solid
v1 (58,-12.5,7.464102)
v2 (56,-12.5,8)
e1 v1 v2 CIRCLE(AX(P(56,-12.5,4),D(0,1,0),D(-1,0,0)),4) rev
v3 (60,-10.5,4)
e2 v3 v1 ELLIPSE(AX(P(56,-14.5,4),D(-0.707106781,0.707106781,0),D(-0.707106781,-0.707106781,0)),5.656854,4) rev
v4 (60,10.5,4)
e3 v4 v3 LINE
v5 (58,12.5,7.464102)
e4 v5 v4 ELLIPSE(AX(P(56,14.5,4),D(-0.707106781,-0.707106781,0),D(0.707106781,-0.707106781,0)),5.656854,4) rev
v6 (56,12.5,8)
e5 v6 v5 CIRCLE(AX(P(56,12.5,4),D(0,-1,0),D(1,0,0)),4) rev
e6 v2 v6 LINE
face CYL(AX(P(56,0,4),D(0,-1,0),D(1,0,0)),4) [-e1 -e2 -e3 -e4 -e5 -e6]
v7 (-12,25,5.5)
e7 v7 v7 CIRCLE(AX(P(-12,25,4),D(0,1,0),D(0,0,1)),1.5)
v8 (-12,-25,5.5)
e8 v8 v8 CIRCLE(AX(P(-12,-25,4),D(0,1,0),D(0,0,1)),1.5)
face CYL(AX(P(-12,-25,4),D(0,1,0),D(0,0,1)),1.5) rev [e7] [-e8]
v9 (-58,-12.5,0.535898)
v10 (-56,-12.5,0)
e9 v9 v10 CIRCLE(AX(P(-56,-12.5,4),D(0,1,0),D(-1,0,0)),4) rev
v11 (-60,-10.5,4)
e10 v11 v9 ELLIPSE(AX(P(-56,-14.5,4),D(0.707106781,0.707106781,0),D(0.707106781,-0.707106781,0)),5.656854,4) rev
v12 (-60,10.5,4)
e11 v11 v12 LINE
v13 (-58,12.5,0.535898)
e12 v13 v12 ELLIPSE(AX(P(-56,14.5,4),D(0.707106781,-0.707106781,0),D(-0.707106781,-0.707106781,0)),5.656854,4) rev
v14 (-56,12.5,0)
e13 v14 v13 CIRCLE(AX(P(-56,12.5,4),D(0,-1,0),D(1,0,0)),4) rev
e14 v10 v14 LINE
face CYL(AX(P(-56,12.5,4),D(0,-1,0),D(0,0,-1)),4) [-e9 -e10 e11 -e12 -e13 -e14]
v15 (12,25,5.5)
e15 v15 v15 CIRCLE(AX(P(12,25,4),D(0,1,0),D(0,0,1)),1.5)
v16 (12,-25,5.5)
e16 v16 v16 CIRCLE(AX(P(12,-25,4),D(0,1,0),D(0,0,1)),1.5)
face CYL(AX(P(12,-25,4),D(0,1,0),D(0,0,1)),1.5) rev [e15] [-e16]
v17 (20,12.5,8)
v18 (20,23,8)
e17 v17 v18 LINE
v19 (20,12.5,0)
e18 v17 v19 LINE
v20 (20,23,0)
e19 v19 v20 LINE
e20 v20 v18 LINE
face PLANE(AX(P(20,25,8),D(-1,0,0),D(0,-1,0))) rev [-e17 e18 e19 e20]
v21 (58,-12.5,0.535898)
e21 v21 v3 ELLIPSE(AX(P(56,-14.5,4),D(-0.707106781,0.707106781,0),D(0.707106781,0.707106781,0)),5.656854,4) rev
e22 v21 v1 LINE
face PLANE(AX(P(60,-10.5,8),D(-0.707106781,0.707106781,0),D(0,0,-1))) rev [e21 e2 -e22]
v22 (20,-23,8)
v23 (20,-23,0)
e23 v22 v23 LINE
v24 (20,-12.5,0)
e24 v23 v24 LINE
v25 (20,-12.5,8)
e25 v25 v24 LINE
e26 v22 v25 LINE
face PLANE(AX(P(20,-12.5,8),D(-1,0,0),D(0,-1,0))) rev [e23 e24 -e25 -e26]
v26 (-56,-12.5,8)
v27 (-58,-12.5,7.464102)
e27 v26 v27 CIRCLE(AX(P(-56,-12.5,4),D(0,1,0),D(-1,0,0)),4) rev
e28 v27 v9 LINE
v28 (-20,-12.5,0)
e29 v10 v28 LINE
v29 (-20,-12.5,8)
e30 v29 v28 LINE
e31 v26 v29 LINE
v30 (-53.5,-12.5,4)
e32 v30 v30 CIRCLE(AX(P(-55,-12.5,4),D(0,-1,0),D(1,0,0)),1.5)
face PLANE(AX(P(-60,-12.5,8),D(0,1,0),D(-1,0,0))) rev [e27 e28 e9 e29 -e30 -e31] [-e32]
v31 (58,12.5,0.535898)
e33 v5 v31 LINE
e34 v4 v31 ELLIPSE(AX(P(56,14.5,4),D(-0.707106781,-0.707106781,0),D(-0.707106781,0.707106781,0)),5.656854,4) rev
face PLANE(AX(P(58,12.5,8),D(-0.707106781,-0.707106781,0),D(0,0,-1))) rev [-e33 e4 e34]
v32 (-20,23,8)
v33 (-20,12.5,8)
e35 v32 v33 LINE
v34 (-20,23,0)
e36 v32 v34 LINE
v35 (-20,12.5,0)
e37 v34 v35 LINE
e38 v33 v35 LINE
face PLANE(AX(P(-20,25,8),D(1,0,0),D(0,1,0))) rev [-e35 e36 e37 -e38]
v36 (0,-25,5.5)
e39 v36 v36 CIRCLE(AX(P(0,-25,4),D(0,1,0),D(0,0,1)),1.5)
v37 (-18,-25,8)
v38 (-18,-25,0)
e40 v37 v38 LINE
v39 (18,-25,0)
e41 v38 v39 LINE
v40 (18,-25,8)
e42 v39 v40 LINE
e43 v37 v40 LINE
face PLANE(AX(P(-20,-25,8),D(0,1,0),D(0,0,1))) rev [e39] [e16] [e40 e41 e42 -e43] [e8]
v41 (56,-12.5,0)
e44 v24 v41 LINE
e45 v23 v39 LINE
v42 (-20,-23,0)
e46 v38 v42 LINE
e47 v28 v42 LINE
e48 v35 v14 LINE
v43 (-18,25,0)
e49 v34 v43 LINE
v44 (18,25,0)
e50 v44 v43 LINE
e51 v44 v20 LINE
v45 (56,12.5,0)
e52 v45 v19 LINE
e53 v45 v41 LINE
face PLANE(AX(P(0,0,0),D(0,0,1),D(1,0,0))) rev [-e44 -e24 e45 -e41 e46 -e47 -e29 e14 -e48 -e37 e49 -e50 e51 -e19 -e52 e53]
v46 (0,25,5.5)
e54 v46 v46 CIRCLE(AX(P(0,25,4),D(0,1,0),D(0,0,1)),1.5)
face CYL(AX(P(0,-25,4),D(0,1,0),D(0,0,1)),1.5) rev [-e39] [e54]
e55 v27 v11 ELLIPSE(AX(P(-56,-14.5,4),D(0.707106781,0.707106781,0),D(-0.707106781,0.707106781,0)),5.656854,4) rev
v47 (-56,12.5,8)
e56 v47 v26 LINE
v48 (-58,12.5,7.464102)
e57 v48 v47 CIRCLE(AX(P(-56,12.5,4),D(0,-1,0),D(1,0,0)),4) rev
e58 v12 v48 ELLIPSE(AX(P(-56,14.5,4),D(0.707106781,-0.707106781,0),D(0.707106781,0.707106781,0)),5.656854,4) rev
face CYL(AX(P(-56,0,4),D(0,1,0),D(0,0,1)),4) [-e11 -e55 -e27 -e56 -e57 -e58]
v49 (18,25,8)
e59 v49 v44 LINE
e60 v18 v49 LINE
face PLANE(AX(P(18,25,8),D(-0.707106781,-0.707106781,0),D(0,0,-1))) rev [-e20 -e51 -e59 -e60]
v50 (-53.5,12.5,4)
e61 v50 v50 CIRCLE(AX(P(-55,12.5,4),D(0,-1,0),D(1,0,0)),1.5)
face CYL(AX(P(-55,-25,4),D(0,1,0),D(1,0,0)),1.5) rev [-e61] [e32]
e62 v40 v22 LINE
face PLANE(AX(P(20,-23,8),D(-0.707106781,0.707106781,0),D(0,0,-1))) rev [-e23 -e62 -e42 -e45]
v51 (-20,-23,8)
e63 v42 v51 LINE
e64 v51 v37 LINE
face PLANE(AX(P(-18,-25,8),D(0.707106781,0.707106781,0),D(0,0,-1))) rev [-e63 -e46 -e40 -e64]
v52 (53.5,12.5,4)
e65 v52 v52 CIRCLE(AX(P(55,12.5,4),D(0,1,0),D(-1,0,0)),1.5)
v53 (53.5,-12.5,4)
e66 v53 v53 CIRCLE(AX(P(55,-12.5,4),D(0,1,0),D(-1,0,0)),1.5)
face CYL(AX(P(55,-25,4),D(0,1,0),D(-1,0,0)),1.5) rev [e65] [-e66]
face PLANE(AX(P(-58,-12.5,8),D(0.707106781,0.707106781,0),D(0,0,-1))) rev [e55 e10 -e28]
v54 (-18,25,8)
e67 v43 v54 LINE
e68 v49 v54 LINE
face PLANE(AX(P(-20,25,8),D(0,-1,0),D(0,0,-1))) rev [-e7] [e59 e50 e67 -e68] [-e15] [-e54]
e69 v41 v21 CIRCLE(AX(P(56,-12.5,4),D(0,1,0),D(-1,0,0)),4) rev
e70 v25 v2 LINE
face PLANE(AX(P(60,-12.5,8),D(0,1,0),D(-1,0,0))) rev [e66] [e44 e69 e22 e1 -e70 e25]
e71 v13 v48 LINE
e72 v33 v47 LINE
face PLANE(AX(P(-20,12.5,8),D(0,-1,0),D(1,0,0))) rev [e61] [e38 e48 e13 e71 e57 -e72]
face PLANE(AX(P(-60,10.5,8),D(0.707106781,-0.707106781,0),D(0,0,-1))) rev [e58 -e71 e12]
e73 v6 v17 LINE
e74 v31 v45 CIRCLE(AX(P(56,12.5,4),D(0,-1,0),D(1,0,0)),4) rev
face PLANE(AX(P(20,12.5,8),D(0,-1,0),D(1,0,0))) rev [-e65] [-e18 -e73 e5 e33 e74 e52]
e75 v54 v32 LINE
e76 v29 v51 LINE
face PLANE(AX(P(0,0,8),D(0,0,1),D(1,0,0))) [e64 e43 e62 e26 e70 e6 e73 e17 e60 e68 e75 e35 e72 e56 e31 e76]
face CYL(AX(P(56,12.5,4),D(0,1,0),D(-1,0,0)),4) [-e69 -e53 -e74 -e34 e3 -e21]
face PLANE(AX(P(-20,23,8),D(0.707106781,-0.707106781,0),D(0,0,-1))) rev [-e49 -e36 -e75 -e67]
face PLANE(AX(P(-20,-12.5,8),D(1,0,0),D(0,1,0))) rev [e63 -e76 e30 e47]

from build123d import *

# Parameters (mm, degrees)
EXTRUDE_1_DEPTH     = 8
CHAMFER_1_SIZE      = 2
SKETCH_4_R          = 1.5
CUT_EXTRUDE_3_DEPTH = 50
CHAMFER_3_SIZE      = 2
FILLET_1_R          = 4
SKETCH_6_R          = 1.5
CUT_EXTRUDE_5_DEPTH = 72.205687975


with BuildPart() as part:
    # 草图1 → 凸台-拉伸1 (new body)
    with BuildSketch(Plane.XY):
        Polygon((-20, 25), (20, 25), (20, 12.5), (60, 12.5), (60, -12.5), (20, -12.5), (20, -25), (-20, -25), (-20, -12.5), (-60, -12.5), (-60, 12.5), (-20, 12.5), align=None)
    extrude(amount=EXTRUDE_1_DEPTH)

    # 倒角1
    chamfer_1_edges = [part.edges().sort_by_distance(p)[0] for p in [
        (20, -25, 4),
        (-20, -25, 4),
        (-20, 25, 4),
        (20, 25, 4),
    ]]
    chamfer(chamfer_1_edges, length=CHAMFER_1_SIZE)

    # 草图4 → 切除-拉伸3 (cut)
    with BuildSketch(Plane(origin=(0, 25, 0), x_dir=(1, 0, 0), z_dir=(0, 1, 0))):
        with Locations(Location((-12, -4, 0), (0, 0, 270))):
            Circle(SKETCH_4_R)
        with Locations(Location((0, -4, 0), (0, 0, 270))):
            Circle(SKETCH_4_R)
        with Locations(Location((12, -4, 0), (0, 0, 270))):
            Circle(SKETCH_4_R)
    extrude(amount=-CUT_EXTRUDE_3_DEPTH, mode=Mode.SUBTRACT)

    # 倒角3
    chamfer_3_edges = [part.edges().sort_by_distance(p)[0] for p in [
        (-60, -12.5, 4),
        (-60, 12.5, 4),
        (60, 12.5, 4),
        (60, -12.5, 4),
    ]]
    chamfer(chamfer_3_edges, length=CHAMFER_3_SIZE)

    # 圆角1
    fillet_1_edges = [part.edges().sort_by_distance(p)[0] for p in [
        (60, 0, 0),
        (60, 0, 8),
        (-60, 0, 0),
        (-60, 0, 8),
    ]]
    fillet(fillet_1_edges, radius=FILLET_1_R - 0.0001)  # a hair under: the kernel refuses the full size

    # 草图6 → 切除-拉伸5 (cut, through all)
    with BuildSketch(Plane(origin=(0, 12.5, 0), x_dir=(1, 0, 0), z_dir=(0, 1, 0))):
        with Locations(Location((55, -4, 0), (0, 0, 180))):
            Circle(SKETCH_6_R)
    cut_extrude_5 = extrude(amount=-CUT_EXTRUDE_5_DEPTH, mode=Mode.SUBTRACT)

    # 镜向4: 切除-拉伸5 across plane
    add(cut_extrude_5.mirror(Plane(origin=(0, 0, 0), x_dir=(0, 0, 1), z_dir=(1, 0, 0))), mode=Mode.SUBTRACT)


solid = part.part
